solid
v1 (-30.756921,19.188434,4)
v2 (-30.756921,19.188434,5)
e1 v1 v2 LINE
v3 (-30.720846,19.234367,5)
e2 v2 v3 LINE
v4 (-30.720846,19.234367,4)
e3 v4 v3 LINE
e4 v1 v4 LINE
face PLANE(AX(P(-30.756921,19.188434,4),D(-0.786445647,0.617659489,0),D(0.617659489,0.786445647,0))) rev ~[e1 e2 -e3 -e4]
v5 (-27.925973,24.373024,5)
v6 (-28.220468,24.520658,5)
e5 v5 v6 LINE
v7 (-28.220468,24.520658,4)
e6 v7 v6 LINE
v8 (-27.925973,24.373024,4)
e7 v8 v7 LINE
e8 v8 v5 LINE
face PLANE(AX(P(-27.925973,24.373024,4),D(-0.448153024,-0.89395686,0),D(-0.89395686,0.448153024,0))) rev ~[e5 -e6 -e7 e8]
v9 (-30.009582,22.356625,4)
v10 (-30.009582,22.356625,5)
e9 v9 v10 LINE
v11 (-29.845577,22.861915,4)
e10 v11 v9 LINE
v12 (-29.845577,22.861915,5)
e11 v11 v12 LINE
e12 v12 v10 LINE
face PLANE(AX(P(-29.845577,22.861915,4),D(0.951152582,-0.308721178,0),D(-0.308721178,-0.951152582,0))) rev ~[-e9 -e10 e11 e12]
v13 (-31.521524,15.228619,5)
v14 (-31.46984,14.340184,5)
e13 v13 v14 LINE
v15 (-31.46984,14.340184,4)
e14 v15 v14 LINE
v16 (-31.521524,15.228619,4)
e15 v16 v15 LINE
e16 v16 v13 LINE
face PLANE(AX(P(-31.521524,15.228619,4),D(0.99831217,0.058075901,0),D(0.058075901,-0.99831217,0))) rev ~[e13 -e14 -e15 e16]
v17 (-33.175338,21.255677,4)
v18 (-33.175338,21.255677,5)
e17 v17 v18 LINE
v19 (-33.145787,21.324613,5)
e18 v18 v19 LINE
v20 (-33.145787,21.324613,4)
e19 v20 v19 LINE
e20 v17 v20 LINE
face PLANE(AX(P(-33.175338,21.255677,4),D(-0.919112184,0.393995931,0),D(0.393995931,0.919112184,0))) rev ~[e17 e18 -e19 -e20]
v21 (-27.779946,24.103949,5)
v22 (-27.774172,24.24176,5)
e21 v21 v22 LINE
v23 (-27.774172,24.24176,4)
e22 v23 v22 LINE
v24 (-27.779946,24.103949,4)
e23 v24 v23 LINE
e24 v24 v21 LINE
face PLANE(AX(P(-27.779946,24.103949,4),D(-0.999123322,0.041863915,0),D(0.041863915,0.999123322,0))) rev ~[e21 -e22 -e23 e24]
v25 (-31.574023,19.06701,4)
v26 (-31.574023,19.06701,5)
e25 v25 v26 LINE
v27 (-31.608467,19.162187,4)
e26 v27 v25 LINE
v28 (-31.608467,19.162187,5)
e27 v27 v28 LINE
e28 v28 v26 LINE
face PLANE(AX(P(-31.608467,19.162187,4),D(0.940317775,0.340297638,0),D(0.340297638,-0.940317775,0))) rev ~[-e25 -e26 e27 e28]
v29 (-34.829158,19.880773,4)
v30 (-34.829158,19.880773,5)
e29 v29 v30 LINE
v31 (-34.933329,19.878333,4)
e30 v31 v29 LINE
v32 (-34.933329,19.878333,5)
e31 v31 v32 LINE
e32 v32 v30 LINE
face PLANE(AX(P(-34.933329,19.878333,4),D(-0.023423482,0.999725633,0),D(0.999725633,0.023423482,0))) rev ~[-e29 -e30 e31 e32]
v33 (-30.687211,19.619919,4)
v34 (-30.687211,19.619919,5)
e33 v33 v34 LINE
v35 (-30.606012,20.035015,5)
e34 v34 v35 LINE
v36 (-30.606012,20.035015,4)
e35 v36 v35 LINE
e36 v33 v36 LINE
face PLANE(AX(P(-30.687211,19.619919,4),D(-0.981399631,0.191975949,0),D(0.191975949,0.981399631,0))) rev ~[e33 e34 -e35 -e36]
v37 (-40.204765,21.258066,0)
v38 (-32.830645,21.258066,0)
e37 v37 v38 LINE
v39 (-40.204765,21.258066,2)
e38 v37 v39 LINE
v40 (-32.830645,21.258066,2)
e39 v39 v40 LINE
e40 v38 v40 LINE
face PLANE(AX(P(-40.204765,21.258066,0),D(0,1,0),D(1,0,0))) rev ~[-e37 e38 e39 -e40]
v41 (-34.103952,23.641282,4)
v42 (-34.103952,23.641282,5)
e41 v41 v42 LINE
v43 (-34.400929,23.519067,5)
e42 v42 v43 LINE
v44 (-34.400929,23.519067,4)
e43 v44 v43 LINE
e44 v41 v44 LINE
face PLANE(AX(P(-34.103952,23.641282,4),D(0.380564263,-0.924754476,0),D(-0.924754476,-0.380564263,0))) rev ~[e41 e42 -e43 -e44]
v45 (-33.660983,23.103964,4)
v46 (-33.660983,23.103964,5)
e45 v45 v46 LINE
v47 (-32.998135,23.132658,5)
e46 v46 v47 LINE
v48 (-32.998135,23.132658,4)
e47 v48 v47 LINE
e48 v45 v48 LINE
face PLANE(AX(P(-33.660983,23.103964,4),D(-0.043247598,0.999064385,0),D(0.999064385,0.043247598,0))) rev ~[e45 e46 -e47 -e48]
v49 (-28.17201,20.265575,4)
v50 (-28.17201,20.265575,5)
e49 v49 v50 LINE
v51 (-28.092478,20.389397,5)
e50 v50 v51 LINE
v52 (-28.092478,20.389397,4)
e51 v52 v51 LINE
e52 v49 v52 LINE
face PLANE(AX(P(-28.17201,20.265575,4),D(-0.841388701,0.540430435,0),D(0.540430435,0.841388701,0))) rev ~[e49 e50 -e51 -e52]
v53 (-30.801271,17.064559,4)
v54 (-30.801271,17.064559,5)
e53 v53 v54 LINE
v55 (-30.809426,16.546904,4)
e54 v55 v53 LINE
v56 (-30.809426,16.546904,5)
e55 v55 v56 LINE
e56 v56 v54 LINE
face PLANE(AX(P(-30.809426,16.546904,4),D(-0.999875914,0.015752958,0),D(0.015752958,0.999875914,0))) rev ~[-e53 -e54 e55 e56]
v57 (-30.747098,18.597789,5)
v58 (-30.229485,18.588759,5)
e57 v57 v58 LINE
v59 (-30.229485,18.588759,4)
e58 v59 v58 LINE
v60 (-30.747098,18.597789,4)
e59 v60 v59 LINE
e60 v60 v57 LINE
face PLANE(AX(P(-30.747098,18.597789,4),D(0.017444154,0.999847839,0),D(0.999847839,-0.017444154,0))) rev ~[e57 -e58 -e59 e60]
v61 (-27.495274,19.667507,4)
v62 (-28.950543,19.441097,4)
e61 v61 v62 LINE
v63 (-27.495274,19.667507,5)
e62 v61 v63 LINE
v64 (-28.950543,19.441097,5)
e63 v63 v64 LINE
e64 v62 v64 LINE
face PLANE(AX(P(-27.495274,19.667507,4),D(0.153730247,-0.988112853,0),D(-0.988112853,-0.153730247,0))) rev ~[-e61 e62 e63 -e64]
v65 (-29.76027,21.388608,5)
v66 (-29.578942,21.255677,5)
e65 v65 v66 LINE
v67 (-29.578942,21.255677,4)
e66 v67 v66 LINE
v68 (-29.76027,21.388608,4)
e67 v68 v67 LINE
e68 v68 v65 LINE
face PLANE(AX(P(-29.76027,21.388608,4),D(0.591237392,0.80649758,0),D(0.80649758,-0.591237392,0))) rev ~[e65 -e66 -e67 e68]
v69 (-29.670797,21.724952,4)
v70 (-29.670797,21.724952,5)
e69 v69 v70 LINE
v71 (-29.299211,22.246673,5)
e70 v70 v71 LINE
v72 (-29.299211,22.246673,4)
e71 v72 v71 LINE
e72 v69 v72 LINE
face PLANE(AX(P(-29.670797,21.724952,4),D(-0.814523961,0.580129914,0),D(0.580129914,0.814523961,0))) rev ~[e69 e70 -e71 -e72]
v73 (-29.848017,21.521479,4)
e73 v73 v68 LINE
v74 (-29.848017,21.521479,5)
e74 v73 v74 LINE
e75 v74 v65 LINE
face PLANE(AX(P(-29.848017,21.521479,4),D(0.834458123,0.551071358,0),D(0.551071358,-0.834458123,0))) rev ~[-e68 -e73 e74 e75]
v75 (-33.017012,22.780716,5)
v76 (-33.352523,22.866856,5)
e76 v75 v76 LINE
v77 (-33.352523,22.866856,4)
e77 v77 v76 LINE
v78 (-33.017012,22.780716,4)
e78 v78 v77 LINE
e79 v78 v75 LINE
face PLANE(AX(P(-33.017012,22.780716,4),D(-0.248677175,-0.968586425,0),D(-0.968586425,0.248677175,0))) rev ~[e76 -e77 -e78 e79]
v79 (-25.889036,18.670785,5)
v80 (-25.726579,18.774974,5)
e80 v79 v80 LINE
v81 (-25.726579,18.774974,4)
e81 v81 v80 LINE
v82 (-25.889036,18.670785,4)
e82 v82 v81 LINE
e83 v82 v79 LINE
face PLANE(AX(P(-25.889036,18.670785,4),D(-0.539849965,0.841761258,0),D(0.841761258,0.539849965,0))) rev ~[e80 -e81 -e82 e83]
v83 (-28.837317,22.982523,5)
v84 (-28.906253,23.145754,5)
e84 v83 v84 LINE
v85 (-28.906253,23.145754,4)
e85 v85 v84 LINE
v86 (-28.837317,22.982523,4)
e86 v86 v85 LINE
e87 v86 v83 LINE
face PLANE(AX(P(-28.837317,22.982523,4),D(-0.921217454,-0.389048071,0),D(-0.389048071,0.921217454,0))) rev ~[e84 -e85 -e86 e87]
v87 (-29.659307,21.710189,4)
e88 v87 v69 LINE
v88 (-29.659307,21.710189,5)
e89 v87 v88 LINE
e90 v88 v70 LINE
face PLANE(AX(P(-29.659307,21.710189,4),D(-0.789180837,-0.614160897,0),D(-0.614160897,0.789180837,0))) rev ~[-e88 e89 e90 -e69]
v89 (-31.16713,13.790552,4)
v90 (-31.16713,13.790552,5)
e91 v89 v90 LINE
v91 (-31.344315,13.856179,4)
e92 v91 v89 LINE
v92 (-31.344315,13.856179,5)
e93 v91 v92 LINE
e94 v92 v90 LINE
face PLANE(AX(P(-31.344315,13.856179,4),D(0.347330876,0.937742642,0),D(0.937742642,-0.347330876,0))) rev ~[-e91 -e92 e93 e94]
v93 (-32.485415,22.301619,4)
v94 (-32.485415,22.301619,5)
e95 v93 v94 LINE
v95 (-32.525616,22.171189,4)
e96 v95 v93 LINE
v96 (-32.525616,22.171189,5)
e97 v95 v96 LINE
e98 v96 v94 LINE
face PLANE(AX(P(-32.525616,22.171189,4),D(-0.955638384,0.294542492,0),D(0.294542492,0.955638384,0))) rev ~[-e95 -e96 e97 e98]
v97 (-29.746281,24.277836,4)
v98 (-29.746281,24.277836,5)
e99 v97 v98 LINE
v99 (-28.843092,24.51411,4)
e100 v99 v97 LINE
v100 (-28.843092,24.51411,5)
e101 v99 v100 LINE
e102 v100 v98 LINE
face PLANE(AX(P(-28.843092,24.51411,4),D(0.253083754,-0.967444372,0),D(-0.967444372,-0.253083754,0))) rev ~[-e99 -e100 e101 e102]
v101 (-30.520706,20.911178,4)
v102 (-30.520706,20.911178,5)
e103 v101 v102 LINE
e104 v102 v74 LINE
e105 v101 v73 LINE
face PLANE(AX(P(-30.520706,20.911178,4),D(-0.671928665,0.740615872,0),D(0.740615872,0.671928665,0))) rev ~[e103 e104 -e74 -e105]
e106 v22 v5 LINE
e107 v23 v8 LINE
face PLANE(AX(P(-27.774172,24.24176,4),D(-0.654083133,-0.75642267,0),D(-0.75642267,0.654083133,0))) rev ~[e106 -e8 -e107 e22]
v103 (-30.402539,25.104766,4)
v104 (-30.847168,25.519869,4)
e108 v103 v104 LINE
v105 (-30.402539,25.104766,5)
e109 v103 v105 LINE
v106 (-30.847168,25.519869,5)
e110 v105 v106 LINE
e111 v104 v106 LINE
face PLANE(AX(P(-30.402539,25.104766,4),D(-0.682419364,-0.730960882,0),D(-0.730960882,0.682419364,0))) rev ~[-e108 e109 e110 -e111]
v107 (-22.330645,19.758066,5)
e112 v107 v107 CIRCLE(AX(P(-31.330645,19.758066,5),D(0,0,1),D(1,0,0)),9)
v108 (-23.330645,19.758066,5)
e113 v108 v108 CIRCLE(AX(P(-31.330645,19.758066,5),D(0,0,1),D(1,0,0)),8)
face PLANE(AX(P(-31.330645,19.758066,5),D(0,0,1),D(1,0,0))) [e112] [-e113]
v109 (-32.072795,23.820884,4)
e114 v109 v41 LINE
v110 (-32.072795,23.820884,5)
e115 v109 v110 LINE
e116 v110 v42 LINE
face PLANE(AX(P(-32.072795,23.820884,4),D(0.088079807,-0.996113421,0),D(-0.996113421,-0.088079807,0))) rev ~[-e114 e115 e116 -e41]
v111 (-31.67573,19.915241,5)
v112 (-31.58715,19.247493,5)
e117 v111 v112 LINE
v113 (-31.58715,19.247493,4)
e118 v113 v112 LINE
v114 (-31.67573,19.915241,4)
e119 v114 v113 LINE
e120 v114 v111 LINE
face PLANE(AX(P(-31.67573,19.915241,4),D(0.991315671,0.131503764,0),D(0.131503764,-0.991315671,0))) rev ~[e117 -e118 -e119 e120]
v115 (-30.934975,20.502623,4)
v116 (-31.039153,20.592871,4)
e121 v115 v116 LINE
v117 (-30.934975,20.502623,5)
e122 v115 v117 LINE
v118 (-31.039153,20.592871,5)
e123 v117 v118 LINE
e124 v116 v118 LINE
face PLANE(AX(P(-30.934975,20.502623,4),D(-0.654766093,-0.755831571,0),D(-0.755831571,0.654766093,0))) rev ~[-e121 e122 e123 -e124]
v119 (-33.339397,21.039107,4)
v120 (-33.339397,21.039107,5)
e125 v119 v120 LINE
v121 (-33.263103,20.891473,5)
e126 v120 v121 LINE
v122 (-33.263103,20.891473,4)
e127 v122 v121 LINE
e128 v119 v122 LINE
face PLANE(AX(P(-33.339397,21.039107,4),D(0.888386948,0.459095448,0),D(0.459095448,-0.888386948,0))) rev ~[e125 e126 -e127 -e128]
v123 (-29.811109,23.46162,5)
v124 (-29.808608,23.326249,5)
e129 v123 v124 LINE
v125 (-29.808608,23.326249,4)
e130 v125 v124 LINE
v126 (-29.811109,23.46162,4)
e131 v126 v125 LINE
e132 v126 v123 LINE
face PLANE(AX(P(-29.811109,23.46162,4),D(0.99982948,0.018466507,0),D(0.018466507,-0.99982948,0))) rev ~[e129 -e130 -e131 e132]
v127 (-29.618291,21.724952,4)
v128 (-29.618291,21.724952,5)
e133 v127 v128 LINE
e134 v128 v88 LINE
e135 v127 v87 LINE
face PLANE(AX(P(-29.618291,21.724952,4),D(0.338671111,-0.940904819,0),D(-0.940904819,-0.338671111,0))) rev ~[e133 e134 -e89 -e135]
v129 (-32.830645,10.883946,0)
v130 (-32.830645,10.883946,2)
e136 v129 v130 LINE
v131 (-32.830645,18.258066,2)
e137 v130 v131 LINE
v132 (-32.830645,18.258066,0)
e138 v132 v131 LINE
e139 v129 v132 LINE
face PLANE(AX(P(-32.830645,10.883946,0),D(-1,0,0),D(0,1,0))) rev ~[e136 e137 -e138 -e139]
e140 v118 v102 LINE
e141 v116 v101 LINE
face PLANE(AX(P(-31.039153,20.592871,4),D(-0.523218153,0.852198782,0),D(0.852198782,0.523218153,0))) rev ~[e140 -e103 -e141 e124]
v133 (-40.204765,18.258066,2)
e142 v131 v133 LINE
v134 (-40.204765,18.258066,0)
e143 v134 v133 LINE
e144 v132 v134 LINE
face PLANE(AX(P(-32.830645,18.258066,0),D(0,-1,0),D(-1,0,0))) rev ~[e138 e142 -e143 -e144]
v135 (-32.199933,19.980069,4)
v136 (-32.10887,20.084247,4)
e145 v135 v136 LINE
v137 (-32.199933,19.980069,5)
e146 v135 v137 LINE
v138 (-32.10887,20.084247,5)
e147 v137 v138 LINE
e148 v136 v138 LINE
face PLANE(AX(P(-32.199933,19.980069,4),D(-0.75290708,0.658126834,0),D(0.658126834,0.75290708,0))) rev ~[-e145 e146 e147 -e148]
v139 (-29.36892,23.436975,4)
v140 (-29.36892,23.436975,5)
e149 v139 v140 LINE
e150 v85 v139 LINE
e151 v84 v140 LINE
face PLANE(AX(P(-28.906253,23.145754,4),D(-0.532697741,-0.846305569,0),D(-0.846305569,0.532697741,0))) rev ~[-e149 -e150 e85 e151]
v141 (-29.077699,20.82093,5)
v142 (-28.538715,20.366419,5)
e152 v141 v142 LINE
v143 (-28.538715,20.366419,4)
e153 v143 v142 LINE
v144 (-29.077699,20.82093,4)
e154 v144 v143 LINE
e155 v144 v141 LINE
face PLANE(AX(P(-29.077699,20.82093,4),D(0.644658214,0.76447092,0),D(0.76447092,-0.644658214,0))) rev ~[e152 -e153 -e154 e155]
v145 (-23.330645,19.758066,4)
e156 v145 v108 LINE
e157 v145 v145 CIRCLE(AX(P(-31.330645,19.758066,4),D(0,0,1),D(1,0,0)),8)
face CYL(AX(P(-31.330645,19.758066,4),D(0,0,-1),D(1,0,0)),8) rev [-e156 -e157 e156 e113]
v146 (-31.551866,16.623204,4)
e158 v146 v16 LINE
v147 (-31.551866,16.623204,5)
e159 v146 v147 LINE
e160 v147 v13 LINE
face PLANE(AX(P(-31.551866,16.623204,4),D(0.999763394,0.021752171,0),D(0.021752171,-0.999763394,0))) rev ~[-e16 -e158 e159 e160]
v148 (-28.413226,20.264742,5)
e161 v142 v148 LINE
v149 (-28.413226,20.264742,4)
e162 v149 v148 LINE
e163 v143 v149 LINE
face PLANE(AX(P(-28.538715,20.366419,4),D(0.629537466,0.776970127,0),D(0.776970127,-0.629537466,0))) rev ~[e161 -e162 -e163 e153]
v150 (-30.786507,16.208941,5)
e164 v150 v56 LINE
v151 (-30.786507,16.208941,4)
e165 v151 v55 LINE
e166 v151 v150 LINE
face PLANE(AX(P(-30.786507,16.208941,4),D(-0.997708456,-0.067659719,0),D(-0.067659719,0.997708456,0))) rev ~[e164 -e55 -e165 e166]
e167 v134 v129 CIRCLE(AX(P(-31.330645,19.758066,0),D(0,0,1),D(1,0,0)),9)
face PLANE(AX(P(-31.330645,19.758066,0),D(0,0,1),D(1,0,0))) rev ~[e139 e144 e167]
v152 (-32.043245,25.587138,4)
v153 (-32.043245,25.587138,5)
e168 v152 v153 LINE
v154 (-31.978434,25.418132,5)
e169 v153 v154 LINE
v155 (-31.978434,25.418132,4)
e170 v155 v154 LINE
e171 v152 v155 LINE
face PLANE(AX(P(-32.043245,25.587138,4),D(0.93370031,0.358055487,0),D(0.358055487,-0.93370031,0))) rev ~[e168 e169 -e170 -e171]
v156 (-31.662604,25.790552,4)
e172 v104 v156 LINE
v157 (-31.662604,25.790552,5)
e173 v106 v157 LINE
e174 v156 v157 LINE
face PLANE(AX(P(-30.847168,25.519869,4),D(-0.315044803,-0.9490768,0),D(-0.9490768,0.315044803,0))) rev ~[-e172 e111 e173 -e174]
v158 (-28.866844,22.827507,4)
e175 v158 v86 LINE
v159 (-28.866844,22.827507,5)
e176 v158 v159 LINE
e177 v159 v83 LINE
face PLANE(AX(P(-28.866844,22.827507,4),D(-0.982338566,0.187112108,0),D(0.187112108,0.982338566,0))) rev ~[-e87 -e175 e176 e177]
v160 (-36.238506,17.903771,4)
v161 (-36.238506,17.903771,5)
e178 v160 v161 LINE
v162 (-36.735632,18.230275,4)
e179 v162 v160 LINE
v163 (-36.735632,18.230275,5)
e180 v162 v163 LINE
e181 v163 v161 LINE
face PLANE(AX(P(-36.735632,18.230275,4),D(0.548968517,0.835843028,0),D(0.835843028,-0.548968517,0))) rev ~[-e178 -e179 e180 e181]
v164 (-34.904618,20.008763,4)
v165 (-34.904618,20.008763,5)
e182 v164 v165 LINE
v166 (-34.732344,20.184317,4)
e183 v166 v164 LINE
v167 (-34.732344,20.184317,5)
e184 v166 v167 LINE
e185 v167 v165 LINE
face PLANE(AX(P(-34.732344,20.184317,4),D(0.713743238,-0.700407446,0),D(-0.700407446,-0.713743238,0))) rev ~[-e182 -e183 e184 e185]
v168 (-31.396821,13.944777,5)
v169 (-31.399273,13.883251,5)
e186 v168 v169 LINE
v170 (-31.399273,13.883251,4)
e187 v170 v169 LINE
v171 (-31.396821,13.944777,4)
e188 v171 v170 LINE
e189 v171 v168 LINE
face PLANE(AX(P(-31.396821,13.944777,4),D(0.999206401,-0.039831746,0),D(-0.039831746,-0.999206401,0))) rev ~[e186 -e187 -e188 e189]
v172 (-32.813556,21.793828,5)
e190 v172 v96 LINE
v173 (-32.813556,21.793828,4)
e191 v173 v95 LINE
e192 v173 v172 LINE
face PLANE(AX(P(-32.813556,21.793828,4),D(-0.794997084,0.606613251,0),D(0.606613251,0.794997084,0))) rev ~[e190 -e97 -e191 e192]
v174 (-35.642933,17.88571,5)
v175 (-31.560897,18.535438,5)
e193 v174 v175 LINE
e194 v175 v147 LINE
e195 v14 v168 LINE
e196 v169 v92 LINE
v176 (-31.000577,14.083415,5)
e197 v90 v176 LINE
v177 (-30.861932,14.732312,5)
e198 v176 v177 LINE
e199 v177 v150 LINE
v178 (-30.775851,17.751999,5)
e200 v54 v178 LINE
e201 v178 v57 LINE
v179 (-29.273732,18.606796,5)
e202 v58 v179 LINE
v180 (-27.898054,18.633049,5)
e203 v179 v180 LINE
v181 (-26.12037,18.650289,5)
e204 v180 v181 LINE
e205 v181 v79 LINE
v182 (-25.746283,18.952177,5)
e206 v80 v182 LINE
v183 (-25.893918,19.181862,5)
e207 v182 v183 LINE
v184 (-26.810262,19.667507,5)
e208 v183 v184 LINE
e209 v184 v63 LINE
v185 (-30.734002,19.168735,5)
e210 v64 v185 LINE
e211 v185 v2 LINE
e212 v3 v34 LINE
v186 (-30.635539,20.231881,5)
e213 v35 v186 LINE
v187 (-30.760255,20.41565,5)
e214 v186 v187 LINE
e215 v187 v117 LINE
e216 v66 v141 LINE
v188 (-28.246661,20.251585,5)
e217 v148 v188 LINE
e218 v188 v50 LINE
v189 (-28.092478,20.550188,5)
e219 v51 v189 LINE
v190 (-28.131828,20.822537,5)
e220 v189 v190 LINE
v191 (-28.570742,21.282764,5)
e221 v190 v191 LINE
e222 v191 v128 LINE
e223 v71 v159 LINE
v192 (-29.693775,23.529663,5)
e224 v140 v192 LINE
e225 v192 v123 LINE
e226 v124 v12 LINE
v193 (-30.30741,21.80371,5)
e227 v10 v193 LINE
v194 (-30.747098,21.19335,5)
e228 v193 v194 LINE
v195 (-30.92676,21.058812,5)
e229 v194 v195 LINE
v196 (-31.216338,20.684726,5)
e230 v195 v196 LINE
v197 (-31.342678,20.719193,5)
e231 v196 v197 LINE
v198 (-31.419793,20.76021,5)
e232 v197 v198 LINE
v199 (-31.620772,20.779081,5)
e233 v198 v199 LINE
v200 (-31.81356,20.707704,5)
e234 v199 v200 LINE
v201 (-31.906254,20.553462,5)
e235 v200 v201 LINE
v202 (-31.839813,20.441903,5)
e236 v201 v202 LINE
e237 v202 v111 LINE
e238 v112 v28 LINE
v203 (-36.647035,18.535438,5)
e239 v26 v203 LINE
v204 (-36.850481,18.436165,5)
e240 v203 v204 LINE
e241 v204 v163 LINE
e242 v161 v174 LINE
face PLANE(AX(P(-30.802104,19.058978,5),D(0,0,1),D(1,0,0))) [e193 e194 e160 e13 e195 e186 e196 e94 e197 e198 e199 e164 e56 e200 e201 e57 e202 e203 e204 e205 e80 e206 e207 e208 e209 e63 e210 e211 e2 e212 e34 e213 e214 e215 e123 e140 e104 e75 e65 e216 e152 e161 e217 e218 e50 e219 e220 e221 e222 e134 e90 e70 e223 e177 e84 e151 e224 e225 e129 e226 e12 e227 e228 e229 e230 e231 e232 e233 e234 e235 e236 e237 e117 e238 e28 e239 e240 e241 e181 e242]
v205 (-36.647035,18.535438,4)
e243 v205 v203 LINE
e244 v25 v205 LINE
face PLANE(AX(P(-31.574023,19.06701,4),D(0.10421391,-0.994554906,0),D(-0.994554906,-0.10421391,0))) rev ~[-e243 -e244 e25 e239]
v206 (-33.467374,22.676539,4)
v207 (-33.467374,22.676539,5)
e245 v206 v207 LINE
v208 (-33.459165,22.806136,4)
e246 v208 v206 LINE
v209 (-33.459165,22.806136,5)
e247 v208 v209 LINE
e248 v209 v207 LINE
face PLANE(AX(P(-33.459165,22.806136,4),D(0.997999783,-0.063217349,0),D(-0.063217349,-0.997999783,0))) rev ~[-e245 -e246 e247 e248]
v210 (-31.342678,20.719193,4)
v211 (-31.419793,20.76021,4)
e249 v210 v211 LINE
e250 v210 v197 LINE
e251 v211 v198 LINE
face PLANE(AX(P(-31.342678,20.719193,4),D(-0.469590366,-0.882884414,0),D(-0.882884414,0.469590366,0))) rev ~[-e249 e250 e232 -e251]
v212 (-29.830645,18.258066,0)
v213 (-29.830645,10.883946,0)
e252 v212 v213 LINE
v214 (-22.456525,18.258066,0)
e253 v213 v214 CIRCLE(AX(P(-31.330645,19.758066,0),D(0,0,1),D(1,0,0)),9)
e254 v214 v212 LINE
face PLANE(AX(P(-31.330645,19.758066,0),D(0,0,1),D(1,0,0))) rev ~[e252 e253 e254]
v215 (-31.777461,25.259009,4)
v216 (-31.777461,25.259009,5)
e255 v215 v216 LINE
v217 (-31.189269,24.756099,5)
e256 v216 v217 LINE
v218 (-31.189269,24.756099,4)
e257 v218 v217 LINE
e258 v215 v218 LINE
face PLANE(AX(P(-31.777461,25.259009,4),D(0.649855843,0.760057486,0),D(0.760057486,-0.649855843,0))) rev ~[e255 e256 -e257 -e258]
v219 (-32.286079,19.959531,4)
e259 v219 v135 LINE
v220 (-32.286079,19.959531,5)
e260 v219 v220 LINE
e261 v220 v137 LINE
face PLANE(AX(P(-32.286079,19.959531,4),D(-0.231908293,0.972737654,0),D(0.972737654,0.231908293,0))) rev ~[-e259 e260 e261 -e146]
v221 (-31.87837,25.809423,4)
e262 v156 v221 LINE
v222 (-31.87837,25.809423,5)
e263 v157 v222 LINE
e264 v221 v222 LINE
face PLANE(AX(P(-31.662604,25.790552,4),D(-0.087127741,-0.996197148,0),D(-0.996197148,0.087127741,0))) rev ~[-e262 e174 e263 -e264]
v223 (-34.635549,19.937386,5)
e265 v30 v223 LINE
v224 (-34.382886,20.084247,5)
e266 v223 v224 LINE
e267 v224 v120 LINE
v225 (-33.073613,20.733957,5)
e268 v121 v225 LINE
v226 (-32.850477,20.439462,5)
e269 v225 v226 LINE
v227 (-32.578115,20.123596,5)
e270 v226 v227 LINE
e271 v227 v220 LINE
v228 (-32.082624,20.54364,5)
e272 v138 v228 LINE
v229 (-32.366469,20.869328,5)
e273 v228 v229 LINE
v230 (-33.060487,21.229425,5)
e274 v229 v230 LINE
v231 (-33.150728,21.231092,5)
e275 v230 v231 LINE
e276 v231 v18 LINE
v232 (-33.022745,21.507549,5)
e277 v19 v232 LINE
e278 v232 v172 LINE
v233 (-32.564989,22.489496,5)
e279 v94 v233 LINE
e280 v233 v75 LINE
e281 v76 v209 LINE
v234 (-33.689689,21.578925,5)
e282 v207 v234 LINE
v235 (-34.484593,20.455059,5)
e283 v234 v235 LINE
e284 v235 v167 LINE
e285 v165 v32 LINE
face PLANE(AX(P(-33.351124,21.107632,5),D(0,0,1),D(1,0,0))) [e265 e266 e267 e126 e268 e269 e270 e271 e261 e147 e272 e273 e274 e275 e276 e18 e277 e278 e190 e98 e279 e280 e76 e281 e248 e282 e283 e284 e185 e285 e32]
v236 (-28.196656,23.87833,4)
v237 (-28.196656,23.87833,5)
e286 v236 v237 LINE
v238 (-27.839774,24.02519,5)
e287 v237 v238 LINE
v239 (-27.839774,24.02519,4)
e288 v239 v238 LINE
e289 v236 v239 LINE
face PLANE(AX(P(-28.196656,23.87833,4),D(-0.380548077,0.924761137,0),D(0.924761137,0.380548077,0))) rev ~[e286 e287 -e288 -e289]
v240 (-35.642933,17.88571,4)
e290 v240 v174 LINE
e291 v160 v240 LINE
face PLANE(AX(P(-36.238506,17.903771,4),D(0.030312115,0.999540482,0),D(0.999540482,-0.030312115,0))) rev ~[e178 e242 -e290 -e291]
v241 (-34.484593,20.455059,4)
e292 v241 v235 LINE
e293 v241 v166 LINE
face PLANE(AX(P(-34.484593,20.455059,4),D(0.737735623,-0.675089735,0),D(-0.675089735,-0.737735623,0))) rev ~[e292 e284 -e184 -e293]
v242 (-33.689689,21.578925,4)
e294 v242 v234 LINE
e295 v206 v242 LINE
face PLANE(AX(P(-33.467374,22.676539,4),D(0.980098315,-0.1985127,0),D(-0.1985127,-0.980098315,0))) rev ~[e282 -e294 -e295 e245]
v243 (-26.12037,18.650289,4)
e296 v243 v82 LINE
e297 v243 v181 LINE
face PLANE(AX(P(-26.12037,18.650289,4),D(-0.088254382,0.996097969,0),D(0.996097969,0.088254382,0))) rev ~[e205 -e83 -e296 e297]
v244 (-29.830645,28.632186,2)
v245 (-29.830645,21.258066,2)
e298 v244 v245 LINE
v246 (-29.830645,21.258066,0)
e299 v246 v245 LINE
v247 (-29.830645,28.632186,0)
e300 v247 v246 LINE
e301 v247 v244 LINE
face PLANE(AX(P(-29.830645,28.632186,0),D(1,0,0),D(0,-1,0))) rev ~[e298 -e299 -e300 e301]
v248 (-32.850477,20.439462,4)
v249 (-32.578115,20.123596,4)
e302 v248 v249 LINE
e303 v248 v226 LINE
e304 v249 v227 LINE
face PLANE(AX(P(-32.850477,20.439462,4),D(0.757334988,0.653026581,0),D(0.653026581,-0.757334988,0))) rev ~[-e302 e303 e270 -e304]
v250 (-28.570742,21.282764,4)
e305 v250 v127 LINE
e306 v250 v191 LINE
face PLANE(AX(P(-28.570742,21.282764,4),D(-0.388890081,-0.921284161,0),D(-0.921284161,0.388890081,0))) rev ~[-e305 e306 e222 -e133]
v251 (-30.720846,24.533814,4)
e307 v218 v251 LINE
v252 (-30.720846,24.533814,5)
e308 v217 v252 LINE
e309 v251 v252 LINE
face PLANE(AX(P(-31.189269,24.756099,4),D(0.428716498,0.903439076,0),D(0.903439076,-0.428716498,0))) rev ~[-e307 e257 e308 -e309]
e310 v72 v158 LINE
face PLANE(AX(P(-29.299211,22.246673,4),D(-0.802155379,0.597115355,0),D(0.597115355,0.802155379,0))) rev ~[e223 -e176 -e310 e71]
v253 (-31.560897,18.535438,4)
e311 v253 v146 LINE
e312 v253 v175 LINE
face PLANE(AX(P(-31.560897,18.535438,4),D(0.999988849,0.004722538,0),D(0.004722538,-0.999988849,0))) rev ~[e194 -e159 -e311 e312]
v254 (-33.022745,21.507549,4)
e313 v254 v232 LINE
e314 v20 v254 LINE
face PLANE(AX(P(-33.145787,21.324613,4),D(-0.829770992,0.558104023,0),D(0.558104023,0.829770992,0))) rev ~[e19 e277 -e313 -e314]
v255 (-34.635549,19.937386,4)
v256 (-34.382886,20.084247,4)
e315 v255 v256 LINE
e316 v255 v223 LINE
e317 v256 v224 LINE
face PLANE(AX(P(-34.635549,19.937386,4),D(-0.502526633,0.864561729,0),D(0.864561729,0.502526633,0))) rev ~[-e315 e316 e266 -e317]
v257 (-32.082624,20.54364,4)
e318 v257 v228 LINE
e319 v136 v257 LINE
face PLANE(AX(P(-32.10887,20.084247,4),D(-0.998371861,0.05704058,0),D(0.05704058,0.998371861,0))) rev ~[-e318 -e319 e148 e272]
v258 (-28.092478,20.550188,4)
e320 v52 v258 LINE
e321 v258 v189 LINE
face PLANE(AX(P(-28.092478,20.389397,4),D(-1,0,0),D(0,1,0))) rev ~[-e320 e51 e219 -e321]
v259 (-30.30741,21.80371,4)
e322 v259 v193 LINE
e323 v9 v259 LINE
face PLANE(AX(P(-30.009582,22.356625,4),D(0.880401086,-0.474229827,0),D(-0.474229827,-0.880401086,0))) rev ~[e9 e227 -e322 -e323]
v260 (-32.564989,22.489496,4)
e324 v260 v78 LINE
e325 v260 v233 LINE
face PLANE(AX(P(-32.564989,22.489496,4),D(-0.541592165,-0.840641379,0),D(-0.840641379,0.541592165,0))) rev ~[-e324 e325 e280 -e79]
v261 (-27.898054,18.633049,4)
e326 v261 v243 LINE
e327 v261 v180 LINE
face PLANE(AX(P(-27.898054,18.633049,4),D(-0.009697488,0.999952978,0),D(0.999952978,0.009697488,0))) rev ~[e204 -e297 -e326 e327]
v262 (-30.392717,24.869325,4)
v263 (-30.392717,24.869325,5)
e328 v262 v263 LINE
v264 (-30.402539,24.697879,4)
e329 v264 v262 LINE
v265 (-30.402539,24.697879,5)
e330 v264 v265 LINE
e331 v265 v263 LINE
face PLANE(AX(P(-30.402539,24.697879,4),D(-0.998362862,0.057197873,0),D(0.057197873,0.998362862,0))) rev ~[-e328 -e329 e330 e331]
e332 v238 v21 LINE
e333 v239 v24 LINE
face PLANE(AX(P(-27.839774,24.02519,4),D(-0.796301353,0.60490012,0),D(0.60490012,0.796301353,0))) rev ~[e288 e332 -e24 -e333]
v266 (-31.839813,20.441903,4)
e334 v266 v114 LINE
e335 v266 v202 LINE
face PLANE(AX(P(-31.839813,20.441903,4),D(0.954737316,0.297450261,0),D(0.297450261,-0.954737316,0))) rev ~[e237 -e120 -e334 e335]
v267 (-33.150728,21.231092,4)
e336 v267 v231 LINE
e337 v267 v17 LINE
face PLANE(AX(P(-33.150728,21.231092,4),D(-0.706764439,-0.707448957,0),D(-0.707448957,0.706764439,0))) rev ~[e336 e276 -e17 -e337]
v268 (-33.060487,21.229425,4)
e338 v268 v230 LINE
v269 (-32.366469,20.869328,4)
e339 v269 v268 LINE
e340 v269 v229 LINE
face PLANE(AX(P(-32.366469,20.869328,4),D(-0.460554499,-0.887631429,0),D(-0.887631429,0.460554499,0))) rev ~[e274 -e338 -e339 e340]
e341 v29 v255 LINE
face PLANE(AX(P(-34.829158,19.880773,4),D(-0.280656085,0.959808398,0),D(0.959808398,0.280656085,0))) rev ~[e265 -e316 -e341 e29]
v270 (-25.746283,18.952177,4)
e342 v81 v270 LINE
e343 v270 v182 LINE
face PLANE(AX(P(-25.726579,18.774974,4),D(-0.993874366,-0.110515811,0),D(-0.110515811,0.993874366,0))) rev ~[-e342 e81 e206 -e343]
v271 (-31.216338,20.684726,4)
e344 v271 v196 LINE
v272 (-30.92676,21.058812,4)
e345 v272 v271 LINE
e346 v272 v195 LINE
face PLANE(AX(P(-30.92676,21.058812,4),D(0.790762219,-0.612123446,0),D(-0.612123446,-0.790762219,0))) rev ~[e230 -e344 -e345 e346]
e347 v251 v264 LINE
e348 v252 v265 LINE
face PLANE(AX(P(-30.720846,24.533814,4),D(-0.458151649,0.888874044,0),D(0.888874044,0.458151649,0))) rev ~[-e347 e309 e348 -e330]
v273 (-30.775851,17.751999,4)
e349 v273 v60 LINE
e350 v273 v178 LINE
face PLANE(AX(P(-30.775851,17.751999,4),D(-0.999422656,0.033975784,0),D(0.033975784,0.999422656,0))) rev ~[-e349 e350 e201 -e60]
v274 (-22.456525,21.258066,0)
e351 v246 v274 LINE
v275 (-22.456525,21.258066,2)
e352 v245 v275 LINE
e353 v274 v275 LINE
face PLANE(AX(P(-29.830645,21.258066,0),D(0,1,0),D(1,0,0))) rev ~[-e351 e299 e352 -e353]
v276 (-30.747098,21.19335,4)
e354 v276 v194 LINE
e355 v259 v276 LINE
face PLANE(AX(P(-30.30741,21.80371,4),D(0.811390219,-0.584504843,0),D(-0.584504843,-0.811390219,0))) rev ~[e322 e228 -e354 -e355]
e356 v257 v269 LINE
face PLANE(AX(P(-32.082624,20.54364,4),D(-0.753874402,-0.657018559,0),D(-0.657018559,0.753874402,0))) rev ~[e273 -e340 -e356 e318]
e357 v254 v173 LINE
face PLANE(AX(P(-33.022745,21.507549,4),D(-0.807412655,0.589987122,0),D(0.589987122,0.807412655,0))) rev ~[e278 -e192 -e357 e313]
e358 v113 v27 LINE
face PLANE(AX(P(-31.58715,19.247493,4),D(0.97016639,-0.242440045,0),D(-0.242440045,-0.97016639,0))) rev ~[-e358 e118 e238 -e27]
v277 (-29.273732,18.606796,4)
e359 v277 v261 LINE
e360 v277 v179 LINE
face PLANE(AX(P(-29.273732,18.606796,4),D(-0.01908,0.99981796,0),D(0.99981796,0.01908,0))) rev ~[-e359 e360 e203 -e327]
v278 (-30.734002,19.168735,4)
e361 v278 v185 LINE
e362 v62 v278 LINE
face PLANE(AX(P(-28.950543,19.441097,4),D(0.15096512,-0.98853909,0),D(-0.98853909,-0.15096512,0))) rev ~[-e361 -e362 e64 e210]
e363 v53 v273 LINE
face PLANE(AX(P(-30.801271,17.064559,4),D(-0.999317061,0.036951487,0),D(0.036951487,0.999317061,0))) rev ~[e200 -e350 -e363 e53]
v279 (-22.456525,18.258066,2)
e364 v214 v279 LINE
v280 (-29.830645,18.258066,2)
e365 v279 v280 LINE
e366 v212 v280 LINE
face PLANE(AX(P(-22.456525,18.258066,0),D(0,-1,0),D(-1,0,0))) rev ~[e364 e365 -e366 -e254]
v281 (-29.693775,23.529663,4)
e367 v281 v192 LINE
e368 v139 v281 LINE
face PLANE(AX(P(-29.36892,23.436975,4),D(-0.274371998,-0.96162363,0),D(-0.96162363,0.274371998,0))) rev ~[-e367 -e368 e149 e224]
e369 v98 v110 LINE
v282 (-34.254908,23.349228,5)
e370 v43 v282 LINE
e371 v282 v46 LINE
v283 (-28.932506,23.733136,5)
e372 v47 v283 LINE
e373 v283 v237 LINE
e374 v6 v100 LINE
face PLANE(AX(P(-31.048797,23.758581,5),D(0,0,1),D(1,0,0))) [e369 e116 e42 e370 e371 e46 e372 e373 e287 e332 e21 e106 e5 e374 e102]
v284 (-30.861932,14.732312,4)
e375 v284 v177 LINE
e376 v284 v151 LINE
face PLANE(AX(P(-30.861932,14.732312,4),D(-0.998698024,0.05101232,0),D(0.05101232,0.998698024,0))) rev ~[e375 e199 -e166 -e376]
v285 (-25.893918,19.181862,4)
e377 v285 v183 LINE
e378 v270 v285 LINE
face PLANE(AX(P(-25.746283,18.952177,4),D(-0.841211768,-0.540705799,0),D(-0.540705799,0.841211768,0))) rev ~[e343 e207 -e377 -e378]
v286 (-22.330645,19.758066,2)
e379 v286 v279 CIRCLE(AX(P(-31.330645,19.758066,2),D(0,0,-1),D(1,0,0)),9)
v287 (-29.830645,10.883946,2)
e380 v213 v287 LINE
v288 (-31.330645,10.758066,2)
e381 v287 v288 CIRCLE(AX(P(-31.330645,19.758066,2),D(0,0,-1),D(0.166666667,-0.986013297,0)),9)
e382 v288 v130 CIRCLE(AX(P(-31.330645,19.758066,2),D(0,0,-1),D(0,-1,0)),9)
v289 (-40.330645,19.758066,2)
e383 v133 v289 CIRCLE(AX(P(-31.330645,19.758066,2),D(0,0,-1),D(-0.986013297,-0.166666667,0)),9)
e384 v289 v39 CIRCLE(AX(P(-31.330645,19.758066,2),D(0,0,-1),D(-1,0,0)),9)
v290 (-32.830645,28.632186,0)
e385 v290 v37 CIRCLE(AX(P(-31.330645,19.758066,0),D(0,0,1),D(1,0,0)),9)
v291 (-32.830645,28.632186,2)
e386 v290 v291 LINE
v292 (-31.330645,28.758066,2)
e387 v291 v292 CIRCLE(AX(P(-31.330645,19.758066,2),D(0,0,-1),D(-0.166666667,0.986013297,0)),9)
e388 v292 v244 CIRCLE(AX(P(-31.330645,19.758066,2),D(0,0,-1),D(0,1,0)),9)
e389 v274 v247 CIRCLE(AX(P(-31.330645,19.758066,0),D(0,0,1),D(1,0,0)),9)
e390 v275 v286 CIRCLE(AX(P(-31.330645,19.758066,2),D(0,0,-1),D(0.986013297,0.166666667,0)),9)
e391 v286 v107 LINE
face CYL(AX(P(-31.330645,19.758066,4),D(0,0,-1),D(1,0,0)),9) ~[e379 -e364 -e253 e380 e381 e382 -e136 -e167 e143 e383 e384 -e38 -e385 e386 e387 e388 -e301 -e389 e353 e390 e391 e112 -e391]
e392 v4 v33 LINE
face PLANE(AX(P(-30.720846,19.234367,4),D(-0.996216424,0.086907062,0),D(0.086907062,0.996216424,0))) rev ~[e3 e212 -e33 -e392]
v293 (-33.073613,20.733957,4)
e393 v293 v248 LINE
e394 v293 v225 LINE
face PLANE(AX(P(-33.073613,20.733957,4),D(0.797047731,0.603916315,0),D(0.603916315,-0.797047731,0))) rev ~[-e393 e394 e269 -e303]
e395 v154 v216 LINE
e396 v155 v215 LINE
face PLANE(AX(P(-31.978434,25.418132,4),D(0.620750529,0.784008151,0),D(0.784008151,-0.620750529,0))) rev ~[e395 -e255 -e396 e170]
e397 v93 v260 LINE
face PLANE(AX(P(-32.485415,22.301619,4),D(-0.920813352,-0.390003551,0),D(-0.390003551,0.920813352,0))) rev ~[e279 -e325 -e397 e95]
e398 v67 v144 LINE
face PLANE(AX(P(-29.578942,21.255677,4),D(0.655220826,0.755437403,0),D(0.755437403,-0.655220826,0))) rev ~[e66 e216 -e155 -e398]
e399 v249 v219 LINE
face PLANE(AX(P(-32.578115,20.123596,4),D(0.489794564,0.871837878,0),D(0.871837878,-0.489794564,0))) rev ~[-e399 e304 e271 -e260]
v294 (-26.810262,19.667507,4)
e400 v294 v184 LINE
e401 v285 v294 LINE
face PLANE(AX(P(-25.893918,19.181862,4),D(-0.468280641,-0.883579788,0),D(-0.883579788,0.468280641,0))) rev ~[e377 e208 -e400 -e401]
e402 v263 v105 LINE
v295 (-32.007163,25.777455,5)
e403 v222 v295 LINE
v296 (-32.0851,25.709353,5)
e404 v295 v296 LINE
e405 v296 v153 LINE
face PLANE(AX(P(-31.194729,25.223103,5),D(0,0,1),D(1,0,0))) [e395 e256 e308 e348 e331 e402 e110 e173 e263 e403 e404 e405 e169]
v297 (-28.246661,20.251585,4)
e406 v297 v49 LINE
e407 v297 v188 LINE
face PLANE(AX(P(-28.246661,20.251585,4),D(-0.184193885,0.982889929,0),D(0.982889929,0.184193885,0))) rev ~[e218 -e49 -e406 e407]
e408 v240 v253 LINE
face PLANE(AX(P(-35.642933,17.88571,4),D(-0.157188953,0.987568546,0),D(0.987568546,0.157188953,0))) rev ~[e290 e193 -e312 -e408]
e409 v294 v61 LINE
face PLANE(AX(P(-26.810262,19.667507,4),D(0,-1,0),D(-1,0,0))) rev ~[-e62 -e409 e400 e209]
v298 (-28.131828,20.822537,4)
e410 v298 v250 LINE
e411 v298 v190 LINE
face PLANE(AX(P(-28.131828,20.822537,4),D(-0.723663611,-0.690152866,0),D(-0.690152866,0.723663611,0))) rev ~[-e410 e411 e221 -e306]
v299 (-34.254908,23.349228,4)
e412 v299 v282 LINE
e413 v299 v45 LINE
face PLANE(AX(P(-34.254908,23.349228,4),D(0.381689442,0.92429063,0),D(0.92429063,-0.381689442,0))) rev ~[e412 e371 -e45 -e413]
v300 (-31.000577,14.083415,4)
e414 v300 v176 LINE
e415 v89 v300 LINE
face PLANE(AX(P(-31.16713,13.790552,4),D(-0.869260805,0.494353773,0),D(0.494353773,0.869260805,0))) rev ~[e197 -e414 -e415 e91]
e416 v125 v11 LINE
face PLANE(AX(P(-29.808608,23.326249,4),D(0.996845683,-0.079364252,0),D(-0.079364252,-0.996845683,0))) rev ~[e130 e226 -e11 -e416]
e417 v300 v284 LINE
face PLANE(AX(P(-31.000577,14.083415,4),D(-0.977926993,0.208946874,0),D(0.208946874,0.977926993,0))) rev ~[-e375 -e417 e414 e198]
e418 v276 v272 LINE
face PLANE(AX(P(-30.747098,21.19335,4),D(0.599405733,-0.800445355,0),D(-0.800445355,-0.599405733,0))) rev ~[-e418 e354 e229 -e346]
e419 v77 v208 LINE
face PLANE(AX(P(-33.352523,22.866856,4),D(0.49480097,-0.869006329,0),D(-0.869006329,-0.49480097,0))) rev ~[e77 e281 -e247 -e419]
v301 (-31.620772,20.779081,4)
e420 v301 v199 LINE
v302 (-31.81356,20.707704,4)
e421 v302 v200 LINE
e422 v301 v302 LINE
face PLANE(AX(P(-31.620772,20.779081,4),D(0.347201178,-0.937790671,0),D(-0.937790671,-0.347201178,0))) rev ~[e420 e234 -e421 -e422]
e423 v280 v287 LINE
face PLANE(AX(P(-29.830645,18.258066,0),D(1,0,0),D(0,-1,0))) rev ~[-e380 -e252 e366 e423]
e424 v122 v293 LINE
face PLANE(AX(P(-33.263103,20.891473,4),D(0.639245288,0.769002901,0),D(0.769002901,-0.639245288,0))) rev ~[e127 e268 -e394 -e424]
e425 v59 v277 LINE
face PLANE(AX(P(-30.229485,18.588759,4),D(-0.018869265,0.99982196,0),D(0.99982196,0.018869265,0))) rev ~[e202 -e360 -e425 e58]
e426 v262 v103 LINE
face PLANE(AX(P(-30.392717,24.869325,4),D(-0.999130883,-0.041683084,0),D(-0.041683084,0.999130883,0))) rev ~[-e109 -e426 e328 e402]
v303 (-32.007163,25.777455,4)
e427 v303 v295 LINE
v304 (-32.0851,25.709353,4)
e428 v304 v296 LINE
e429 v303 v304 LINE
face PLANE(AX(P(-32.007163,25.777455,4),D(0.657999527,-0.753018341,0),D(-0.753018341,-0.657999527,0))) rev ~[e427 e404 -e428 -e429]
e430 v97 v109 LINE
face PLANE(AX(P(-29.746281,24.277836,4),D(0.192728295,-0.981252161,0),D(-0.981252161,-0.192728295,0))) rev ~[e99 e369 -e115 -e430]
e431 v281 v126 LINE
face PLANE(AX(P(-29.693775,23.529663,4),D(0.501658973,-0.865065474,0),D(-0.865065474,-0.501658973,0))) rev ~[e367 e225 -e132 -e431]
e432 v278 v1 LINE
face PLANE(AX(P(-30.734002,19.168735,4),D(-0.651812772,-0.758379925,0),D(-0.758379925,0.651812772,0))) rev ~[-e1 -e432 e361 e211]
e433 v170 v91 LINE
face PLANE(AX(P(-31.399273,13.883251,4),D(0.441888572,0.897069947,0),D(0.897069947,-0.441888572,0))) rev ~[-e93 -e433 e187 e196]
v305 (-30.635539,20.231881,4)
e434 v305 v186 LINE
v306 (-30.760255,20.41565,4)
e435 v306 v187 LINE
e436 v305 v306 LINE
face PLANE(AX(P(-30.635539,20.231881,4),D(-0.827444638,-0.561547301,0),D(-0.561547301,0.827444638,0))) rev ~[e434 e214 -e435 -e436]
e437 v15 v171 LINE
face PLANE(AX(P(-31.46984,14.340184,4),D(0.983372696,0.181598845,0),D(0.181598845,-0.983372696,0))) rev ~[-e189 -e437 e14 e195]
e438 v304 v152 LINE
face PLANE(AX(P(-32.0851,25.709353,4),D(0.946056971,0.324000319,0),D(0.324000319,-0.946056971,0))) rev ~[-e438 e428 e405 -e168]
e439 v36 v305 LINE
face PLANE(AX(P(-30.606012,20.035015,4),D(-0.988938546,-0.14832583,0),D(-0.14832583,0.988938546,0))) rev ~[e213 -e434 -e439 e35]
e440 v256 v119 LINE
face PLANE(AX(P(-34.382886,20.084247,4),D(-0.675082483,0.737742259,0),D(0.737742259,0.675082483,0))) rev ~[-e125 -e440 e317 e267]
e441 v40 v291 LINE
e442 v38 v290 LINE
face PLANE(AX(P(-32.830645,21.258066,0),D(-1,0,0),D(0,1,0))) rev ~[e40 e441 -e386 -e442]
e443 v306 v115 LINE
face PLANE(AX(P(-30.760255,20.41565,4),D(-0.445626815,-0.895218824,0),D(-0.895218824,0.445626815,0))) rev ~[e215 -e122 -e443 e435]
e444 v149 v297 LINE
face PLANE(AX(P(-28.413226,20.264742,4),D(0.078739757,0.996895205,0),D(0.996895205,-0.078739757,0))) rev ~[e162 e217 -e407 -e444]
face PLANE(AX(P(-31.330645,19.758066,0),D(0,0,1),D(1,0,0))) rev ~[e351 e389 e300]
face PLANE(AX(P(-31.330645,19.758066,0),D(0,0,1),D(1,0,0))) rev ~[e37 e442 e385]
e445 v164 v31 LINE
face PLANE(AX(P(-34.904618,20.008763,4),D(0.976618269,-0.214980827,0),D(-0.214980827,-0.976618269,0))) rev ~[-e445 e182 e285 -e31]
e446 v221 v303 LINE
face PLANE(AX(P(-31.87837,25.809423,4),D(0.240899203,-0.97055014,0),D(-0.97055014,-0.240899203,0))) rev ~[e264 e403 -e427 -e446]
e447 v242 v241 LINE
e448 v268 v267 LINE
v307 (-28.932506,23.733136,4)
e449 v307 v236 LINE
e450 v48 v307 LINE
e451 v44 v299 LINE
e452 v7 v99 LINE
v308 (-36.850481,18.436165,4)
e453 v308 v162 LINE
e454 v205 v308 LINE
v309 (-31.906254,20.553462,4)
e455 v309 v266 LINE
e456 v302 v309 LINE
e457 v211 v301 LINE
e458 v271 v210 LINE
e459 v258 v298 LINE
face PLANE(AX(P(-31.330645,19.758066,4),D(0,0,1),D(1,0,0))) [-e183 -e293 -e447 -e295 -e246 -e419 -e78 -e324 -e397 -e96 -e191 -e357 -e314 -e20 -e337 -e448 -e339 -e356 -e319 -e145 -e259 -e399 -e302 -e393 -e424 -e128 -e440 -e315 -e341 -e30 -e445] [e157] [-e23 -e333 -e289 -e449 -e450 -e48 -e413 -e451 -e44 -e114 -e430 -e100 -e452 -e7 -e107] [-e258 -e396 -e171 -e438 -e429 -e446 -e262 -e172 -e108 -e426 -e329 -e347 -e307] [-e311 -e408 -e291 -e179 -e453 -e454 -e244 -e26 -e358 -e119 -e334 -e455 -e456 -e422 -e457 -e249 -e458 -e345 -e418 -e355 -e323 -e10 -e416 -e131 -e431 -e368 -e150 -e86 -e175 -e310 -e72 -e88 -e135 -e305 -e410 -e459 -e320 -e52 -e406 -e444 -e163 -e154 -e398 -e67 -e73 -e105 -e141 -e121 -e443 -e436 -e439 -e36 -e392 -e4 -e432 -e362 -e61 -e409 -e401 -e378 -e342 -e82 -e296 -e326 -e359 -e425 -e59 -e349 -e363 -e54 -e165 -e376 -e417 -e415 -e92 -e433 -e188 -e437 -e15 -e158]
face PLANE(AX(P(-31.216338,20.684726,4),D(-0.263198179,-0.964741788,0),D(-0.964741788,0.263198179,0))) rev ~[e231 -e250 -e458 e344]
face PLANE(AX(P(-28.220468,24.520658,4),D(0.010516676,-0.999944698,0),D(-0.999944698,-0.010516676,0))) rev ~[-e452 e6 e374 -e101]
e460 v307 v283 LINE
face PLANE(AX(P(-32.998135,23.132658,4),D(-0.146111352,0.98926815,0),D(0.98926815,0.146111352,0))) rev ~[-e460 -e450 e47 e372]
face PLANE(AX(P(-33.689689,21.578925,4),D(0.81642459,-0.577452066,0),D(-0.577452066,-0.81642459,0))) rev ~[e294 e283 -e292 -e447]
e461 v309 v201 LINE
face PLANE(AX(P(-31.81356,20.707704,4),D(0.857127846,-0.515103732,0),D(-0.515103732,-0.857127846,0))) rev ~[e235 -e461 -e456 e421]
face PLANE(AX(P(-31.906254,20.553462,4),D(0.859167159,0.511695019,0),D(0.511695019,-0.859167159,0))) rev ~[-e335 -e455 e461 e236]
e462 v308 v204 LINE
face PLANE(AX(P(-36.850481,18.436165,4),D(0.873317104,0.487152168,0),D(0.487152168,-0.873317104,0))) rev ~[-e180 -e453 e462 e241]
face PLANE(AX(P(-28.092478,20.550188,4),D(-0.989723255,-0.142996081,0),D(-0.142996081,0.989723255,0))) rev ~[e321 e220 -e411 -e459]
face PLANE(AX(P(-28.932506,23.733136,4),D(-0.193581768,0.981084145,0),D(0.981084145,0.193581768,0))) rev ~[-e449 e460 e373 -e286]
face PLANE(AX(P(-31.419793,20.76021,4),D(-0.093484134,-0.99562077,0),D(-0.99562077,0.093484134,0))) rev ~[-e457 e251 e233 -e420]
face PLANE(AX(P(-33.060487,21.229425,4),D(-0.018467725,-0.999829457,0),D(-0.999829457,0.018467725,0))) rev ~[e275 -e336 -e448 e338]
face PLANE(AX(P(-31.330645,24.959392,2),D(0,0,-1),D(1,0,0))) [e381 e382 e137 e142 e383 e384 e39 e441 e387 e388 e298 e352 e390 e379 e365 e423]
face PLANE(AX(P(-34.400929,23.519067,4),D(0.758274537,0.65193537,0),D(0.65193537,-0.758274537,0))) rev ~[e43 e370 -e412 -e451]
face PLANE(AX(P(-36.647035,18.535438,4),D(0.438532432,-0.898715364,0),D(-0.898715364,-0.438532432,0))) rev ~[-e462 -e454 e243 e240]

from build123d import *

# Parameters (mm, degrees)
F0_R     = 9
F1_DEPTH = 4
F3_W     = 3
F3_H     = 3
F4_DEPTH = 2
F2_R     = 9
F2_R_2   = 8
F5_DEPTH = 1
F7_DEPTH = 1


# Not quite as in the source:
# - a feature names something its author has since deleted; it is built from what else it names


with BuildPart() as f1:
    # F0 (on Top) → F1 (new body)
    with BuildSketch(Plane.XY):
        with Locations((-31.3306450844, 19.7580661625)):
            Circle(F0_R)
    extrude(amount=F1_DEPTH)

    # F3 (on face) → F4 (cut)
    with BuildSketch(Plane(origin=(0, 0, 0), x_dir=(1, 0, 0), z_dir=(0, 0, -1))):
        with BuildLine():
            ThreePointArc((-32.8306450844, -28.6321858371), (-32.0832814269, -28.7265408676), (-31.3306450844, -28.7580661625))
            ThreePointArc((-31.3306450844, -28.7580661625), (-30.5780087419, -28.7265408676), (-29.8306450844, -28.6321858371))
            Line((-29.8306450844, -28.6321858371), (-29.8306450844, -21.2580661625))
            Line((-29.8306450844, -21.2580661625), (-32.8306450844, -21.2580661625))
            Line((-32.8306450844, -21.2580661625), (-32.8306450844, -28.6321858371))
        make_face()
        with BuildLine():
            ThreePointArc((-40.204764759, -18.2580661625), (-40.2991197895, -19.0054298199), (-40.3306450844, -19.7580661625))
            ThreePointArc((-40.3306450844, -19.7580661625), (-40.2991197895, -20.510702505), (-40.204764759, -21.2580661625))
            Line((-40.204764759, -21.2580661625), (-32.8306450844, -21.2580661625))
            Line((-32.8306450844, -21.2580661625), (-32.8306450844, -18.2580661625))
            Line((-32.8306450844, -18.2580661625), (-40.204764759, -18.2580661625))
        make_face()
        with Locations((-31.3306450844, -19.7580661625)):
            Rectangle(F3_W, F3_H)
        with BuildLine():
            Line((-29.8306450844, -18.2580661625), (-29.8306450844, -21.2580661625))
            Line((-29.8306450844, -21.2580661625), (-22.4565254097, -21.2580661625))
            ThreePointArc((-22.4565254097, -21.2580661625), (-22.3621703793, -20.510702505), (-22.3306450844, -19.7580661625))
            ThreePointArc((-22.3306450844, -19.7580661625), (-22.3621703793, -19.0054298199), (-22.4565254097, -18.2580661625))
            Line((-22.4565254097, -18.2580661625), (-29.8306450844, -18.2580661625))
        make_face()
        with BuildLine():
            Line((-32.8306450844, -10.8839464878), (-32.8306450844, -18.2580661625))
            Line((-32.8306450844, -18.2580661625), (-29.8306450844, -18.2580661625))
            Line((-29.8306450844, -18.2580661625), (-29.8306450844, -10.8839464878))
            ThreePointArc((-29.8306450844, -10.8839464878), (-30.5780087419, -10.7895914574), (-31.3306450844, -10.7580661625))
            ThreePointArc((-31.3306450844, -10.7580661625), (-32.0832814269, -10.7895914574), (-32.8306450844, -10.8839464878))
        make_face()
    extrude(amount=-F4_DEPTH, mode=Mode.SUBTRACT)

    # F2 (on face) → F5 (join)
    with BuildSketch(Plane.XY.offset(4)):
        with Locations((-31.3306450844, 19.7580661625)):
            Circle(F2_R)
        with Locations((-31.3306450844, 19.7580661625)):
            Circle(F2_R_2, mode=Mode.SUBTRACT)
    extrude(amount=F5_DEPTH)

    # F6 (on face) → F7 (join)
    with BuildSketch(Plane.XY.offset(4)):
        Polygon((-31.9784342899, 25.4181322135), (-31.7774611038, 25.2590085979), (-31.1892692607, 24.7560993929), (-30.7208457687, 24.5338144768), (-30.4025390075, 24.6978790801), (-30.392716562, 24.8693254), (-30.4025390075, 25.1047664399), (-30.8471683696, 25.5198689359), (-31.6626039755, 25.7905517194), (-31.8783703596, 25.8094227206), (-32.0071634544, 25.7774551255), (-32.085100094, 25.7093528374), (-32.0432445706, 25.5871378045), align=None)
        Polygon((-32.0727952488, 23.82088353), (-34.1039519464, 23.641281604), (-34.4009291186, 23.5190665711), (-34.2549080498, 23.3492275605), (-33.6609834704, 23.1039640751), (-32.9981350893, 23.1326575217), (-28.9325058746, 23.7331363511), (-28.1966558885, 23.8783299532), (-27.8397737053, 24.0251903945), (-27.7799460833, 24.1039485477), (-27.774171676, 24.2417604333), (-27.925973105, 24.373024022), (-28.2204678774, 24.520658353), (-28.8430918564, 24.514110056), (-29.7462805942, 24.2778355965), align=None)
        Polygon((-34.382885584, 20.0842467066), (-33.3393966077, 21.0391074603), (-33.2631029954, 20.8914731293), (-33.073613141, 20.7339568229), (-32.8504769463, 20.4394620505), (-32.5781154176, 20.1235960182), (-32.2860792331, 19.9595314149), (-32.1999334103, 19.9800692553), (-32.1088704119, 20.0842467066), (-32.0826236472, 20.5436395019), (-32.3664685075, 20.8693279796), (-33.0604867821, 21.2294247813), (-33.1507282669, 21.2310916205), (-33.1753379574, 21.255677499), (-33.1457872792, 21.3246132068), (-33.0227447798, 21.5075488113), (-32.8135564575, 21.7938284475), (-32.5256159351, 22.1711889411), (-32.4854153449, 22.3016191102), (-32.5649890587, 22.4894957023), (-33.0170120434, 22.7807163262), (-33.3525229666, 22.866856196), (-33.4591649588, 22.8061356243), (-33.4673741419, 22.6765388749), (-33.689688823, 21.578925248), (-34.4845925415, 20.4550589033), (-34.7323443797, 20.1843165898), (-34.9046181661, 20.0087627019), (-34.9333294717, 19.8783325328), (-34.8291579734, 19.8807732617), (-34.6355486449, 19.9373862652), align=None)
        Polygon((-35.6429326931, 17.8857095862), (-31.560897018, 18.5354375615), (-31.5518663213, 16.6232038893), (-31.5215238944, 15.2286190431), (-31.4698399726, 14.3401836183), (-31.3968205087, 13.9447772089), (-31.3992731436, 13.8832511968), (-31.3443150733, 13.8561793466), (-31.1671300641, 13.7905517194), (-31.0005771079, 14.0834147752), (-30.8619318027, 14.7323117121), (-30.786507328, 16.2089407659), (-30.8094263673, 16.546904324), (-30.8012707611, 17.064559103), (-30.775851463, 17.7519993157), (-30.7470984864, 18.5977892544), (-30.2294853783, 18.5887585576), (-29.2737316751, 18.6067961392), (-27.8980535481, 18.6330488569), (-26.120369519, 18.6502887368), (-25.8890360471, 18.6707849062), (-25.726578753, 18.7749742635), (-25.7462831738, 18.9521771317), (-25.8939175048, 19.1818616234), (-26.8102623665, 19.6675071364), (-27.4952737563, 19.6675071364), (-28.9505434561, 19.4410967932), (-30.7340018925, 19.1687352645), (-30.7569209318, 19.1884337323), (-30.7208457687, 19.2343670588), (-30.6872113344, 19.6199188766), (-30.6060124524, 20.0350154196), (-30.6355393186, 20.2318810376), (-30.7602546103, 20.4156500617), (-30.9349750786, 20.502623351), (-31.0391525299, 20.5928707888), (-30.5207060022, 20.9111775501), (-29.8480173166, 21.5214788248), (-29.7602701377, 21.3886079269), (-29.5789418424, 21.255677499), (-29.0776994767, 20.8209301122), (-28.5387151086, 20.3664187747), (-28.4132259273, 20.2647415822), (-28.2466610651, 20.2515854584), (-28.17201048, 20.2655750018), (-28.0924784372, 20.3893973439), (-28.0924784372, 20.5501877988), (-28.1318277488, 20.8225374215), (-28.5707422337, 21.2827636364), (-29.618291154, 21.7249522697), (-29.6593073048, 21.7101888366), (-29.6707965895, 21.7249522697), (-29.2992105032, 22.2466729458), (-28.8668443153, 22.8275068844), (-28.8373174491, 22.9825229319), (-28.9062531568, 23.1457541156), (-29.3689201006, 23.4369747395), (-29.6937751587, 23.5296629062), (-29.8111087339, 23.461620148), (-29.8086084751, 23.3262489912), (-29.8455765878, 22.8619152083), (-30.0095816611, 22.3566248045), (-30.3074101119, 21.8037104229), (-30.7470984864, 21.1933496182), (-30.9267599424, 21.0588118811), (-31.2163375391, 20.6847255359), (-31.342677999, 20.7191933898), (-31.419793125, 20.7602095406), (-31.620772264, 20.7790805418), (-31.8135600789, 20.7077041052), (-31.9062541986, 20.5534619473), (-31.8398127967, 20.4419027794), (-31.6757303344, 19.9152411156), (-31.5871497358, 19.2474934177), (-31.6084674188, 19.1621869676), (-31.5740233769, 19.067010448), (-36.6470354491, 18.5354375615), (-36.8504809149, 18.4361653799), (-36.7356315255, 18.2302750181), (-36.2385062527, 17.9037709798), align=None)
    extrude(amount=F7_DEPTH)


solid = f1.part
